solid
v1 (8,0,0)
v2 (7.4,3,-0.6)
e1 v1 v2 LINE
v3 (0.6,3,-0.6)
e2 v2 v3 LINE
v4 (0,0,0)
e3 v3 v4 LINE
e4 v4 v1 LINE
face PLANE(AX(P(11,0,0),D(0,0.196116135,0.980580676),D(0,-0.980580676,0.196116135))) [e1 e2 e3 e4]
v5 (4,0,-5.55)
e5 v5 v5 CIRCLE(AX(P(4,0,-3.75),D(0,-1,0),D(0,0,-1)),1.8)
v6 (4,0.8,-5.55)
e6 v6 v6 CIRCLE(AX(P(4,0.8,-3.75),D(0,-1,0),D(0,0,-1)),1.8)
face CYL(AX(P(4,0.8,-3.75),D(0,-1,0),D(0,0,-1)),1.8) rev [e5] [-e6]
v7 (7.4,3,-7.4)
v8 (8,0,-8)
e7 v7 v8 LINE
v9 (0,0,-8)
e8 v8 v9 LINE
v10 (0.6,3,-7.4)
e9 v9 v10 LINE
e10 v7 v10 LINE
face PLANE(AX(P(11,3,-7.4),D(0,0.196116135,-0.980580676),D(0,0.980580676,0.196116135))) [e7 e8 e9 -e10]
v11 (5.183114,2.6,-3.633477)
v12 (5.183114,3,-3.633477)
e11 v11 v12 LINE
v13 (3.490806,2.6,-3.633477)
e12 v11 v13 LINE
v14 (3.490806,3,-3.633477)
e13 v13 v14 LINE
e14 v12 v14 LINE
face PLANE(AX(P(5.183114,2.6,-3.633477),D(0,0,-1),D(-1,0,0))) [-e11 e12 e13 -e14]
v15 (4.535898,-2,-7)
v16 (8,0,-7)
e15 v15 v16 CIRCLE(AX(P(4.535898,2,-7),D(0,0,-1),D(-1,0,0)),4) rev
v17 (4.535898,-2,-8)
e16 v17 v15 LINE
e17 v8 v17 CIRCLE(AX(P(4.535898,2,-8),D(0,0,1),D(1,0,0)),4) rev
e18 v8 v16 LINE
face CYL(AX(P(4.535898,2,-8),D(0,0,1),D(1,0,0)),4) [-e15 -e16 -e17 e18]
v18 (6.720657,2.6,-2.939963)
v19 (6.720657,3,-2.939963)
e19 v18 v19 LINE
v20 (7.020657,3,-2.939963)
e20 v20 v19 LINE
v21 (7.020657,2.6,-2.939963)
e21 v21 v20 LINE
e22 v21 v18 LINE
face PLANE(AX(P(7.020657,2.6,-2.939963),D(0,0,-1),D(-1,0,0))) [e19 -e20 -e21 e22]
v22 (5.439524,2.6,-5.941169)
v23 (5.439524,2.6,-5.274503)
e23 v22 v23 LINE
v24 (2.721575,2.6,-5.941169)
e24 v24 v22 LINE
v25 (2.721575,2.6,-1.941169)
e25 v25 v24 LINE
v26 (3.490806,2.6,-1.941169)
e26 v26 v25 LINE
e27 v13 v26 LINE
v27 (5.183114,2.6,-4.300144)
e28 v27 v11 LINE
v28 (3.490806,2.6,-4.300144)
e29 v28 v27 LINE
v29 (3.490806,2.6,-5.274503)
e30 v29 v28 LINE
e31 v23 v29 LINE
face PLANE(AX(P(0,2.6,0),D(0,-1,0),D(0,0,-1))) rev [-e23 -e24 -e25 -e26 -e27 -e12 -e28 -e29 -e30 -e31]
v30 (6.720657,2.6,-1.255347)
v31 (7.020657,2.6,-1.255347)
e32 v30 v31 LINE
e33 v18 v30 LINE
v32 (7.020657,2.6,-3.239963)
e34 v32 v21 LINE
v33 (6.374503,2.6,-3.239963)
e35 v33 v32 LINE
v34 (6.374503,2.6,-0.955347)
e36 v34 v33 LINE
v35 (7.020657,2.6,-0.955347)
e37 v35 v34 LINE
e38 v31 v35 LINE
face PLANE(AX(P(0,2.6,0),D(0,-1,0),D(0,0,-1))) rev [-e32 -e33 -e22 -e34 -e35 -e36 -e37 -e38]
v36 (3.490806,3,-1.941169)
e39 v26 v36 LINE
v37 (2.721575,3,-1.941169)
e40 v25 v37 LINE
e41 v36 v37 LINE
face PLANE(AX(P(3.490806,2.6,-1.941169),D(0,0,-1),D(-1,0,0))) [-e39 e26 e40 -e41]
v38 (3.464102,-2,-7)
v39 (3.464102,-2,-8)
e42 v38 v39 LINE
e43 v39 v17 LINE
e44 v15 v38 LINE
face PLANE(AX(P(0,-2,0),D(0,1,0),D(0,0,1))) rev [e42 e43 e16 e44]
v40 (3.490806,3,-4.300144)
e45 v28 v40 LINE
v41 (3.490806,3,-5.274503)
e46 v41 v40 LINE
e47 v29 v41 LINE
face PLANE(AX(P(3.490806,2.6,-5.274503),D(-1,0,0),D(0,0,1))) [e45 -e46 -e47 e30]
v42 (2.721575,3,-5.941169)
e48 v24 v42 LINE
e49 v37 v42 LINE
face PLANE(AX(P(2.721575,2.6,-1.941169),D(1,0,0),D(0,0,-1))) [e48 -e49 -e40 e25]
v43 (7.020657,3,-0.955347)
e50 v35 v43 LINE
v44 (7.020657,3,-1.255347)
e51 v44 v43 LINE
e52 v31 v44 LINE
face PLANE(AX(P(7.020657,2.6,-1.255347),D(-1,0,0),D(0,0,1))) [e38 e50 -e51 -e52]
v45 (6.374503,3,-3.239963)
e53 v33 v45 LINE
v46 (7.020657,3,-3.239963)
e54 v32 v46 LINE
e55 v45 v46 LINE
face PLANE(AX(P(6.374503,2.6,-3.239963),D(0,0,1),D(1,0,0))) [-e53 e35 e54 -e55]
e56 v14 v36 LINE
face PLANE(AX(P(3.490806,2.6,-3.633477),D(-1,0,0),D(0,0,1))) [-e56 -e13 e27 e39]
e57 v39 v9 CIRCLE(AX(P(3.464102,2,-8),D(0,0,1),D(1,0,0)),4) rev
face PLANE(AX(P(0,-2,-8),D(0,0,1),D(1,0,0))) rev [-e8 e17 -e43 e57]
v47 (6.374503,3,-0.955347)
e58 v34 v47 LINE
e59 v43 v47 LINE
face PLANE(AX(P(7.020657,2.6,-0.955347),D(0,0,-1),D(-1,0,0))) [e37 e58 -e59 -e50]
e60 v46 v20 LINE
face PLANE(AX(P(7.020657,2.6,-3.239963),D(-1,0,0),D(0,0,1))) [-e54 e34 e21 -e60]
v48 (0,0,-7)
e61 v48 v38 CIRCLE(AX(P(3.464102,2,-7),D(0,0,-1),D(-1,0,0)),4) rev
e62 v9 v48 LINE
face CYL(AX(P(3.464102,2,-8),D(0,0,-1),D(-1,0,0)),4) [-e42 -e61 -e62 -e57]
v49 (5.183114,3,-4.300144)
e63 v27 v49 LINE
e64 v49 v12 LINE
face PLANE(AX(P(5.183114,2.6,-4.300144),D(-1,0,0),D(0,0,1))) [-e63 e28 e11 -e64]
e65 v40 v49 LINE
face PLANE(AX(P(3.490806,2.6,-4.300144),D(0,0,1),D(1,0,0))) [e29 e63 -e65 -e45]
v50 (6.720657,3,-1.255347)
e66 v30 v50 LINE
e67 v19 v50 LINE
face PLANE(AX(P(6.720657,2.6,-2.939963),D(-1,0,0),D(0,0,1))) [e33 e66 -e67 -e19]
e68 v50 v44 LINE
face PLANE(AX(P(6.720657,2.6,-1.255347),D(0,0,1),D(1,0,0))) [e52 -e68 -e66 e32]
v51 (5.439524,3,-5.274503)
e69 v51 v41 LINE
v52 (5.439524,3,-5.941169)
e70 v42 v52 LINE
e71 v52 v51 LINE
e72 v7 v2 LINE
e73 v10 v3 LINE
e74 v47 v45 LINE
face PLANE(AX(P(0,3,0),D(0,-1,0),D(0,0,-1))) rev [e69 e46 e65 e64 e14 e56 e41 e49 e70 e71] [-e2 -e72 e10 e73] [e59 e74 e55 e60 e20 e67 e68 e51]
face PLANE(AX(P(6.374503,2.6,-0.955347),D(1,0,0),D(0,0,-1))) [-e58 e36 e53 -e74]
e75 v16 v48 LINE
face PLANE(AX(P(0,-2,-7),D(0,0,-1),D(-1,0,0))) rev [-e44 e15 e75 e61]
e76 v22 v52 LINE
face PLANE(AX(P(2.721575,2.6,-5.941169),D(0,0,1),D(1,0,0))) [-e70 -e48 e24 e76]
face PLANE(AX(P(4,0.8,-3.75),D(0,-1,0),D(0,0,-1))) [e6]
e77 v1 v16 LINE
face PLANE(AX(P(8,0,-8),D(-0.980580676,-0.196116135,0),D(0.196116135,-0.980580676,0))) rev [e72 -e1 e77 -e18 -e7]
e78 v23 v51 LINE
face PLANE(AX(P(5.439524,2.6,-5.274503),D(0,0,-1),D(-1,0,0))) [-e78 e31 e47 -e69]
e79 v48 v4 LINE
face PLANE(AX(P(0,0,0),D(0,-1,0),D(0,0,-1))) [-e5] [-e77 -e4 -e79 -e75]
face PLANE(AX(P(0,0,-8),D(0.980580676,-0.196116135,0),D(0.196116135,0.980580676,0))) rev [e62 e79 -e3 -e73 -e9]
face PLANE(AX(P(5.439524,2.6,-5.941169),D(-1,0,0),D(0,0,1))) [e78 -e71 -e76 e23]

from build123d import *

# Parameters (mm, degrees)
SKETCH1_W               = 8
SKETCH1_H               = 8
BOSS_EXTRUDE1_DEPTH     = 3
CUT_EXTRUDE1_DEPTH      = 12.704699911
CUT_EXTRUDE1_DEPTH_BACK = 12.704699911
CUT_EXTRUDE2_DEPTH      = 11
SKETCH4_R               = 1.8
CUT_EXTRUDE3_DEPTH      = 0.8
SKETCH5_W               = 8
SKETCH5_H               = 1
BOSS_EXTRUDE2_DEPTH     = 2
FILLET1_R               = 4
CUT_EXTRUDE4_DEPTH      = 0.4
CUT_EXTRUDE5_DEPTH      = 0.4


with BuildPart() as part:
    # Sketch1 → Boss-Extrude1 (new body)
    with BuildSketch(Plane(origin=(0, 0, 0), x_dir=(1, 0, 0), z_dir=(0, 1, 0))):
        with Locations((4, 4)):
            Rectangle(SKETCH1_W, SKETCH1_H)
    extrude(amount=BOSS_EXTRUDE1_DEPTH)

    # Sketch2 → Cut-Extrude1 (cut, two sides: drawn at the far end of the back side and taken through both)
    with BuildSketch(Plane.XY.offset(-CUT_EXTRUDE1_DEPTH_BACK)):
        Polygon((0, 0), (0.6, 3), (0, 3), align=None)
        Polygon((8, 0), (7.4, 3), (8, 3), align=None)
    extrude(amount=CUT_EXTRUDE1_DEPTH + CUT_EXTRUDE1_DEPTH_BACK, mode=Mode.SUBTRACT)

    # Sketch3 → Cut-Extrude2 (cut)
    with BuildSketch(Plane(origin=(0, 0, 0), x_dir=(0, 0, -1), z_dir=(1, 0, 0))):
        Polygon((0, 0), (0.6, 3), (0, 3), align=None)
        Polygon((8, 3), (7.4, 3), (8, 0), align=None)
    extrude(amount=CUT_EXTRUDE2_DEPTH, mode=Mode.SUBTRACT)

    # Sketch4 → Cut-Extrude3 (cut)
    with BuildSketch(Plane.XZ):
        with Locations(Location((4, -3.75, 0), (0, 0, 270))):
            Circle(SKETCH4_R)
    extrude(amount=-CUT_EXTRUDE3_DEPTH, mode=Mode.SUBTRACT)

    # Sketch5 → Boss-Extrude2 (add)
    with BuildSketch(Plane.XZ):
        with Locations((4, -7.5)):
            Rectangle(SKETCH5_W, SKETCH5_H)
    extrude(amount=BOSS_EXTRUDE2_DEPTH)

    # Fillet1
    # the kernel refuses this fillet: 4 mm, written as the material it takes off along each edge
    with BuildSketch(Plane(origin=(8, -2, -16.660254038), x_dir=(0, 1, 0), z_dir=(0, 0, 1)), Plane(origin=(0, -2, 1.660254038), x_dir=(0, 1, 0), z_dir=(0, 0, -1))) as fillet1_piece_1:
        with BuildLine():
            CenterArc((4, 3.464101615), FILLET1_R, 180, 60)
            Line((0, 3.464101615), (-0.08, 3.464101615))
            Line((-0.08, 3.464101615), (-0.08, 0))
            Line((-0.08, 0), (0, -0.08))
            ThreePointArc((0, -0.08), (1, -0.08), (1.96, -0.069282032))
            Line((1.96, -0.069282032), (2, 0))
        make_face()
    extrude(amount=18.320508076, mode=Mode.SUBTRACT)

    # Sketch6 → Cut-Extrude4 (cut)
    with BuildSketch(Plane(origin=(0, 3, 0), x_dir=(1, 0, 0), z_dir=(0, 1, 0))):
        Polygon((2.721575188, 1.941169366), (2.721575188, 5.941169366), (5.439523906, 5.941169366), (5.439523906, 5.2745027), (3.490805957, 5.2745027), (3.490805957, 4.300143725), (5.18311365, 4.300143725), (5.18311365, 3.633477059), (3.490805957, 3.633477059), (3.490805957, 1.941169366), align=None)
    extrude(amount=-CUT_EXTRUDE4_DEPTH, mode=Mode.SUBTRACT)

    # Sketch7 → Cut-Extrude5 (cut)
    with BuildSketch(Plane(origin=(0, 3, 0), x_dir=(1, 0, 0), z_dir=(0, 1, 0))):
        Polygon((6.374503362, 0.955347226), (6.374503362, 3.239962611), (7.020657208, 3.239962611), (7.020657208, 2.939962611), (6.720657208, 2.939962611), (6.720657208, 1.255347226), (7.020657208, 1.255347226), (7.020657208, 0.955347226), align=None)
    extrude(amount=-CUT_EXTRUDE5_DEPTH, mode=Mode.SUBTRACT)


solid = part.part
